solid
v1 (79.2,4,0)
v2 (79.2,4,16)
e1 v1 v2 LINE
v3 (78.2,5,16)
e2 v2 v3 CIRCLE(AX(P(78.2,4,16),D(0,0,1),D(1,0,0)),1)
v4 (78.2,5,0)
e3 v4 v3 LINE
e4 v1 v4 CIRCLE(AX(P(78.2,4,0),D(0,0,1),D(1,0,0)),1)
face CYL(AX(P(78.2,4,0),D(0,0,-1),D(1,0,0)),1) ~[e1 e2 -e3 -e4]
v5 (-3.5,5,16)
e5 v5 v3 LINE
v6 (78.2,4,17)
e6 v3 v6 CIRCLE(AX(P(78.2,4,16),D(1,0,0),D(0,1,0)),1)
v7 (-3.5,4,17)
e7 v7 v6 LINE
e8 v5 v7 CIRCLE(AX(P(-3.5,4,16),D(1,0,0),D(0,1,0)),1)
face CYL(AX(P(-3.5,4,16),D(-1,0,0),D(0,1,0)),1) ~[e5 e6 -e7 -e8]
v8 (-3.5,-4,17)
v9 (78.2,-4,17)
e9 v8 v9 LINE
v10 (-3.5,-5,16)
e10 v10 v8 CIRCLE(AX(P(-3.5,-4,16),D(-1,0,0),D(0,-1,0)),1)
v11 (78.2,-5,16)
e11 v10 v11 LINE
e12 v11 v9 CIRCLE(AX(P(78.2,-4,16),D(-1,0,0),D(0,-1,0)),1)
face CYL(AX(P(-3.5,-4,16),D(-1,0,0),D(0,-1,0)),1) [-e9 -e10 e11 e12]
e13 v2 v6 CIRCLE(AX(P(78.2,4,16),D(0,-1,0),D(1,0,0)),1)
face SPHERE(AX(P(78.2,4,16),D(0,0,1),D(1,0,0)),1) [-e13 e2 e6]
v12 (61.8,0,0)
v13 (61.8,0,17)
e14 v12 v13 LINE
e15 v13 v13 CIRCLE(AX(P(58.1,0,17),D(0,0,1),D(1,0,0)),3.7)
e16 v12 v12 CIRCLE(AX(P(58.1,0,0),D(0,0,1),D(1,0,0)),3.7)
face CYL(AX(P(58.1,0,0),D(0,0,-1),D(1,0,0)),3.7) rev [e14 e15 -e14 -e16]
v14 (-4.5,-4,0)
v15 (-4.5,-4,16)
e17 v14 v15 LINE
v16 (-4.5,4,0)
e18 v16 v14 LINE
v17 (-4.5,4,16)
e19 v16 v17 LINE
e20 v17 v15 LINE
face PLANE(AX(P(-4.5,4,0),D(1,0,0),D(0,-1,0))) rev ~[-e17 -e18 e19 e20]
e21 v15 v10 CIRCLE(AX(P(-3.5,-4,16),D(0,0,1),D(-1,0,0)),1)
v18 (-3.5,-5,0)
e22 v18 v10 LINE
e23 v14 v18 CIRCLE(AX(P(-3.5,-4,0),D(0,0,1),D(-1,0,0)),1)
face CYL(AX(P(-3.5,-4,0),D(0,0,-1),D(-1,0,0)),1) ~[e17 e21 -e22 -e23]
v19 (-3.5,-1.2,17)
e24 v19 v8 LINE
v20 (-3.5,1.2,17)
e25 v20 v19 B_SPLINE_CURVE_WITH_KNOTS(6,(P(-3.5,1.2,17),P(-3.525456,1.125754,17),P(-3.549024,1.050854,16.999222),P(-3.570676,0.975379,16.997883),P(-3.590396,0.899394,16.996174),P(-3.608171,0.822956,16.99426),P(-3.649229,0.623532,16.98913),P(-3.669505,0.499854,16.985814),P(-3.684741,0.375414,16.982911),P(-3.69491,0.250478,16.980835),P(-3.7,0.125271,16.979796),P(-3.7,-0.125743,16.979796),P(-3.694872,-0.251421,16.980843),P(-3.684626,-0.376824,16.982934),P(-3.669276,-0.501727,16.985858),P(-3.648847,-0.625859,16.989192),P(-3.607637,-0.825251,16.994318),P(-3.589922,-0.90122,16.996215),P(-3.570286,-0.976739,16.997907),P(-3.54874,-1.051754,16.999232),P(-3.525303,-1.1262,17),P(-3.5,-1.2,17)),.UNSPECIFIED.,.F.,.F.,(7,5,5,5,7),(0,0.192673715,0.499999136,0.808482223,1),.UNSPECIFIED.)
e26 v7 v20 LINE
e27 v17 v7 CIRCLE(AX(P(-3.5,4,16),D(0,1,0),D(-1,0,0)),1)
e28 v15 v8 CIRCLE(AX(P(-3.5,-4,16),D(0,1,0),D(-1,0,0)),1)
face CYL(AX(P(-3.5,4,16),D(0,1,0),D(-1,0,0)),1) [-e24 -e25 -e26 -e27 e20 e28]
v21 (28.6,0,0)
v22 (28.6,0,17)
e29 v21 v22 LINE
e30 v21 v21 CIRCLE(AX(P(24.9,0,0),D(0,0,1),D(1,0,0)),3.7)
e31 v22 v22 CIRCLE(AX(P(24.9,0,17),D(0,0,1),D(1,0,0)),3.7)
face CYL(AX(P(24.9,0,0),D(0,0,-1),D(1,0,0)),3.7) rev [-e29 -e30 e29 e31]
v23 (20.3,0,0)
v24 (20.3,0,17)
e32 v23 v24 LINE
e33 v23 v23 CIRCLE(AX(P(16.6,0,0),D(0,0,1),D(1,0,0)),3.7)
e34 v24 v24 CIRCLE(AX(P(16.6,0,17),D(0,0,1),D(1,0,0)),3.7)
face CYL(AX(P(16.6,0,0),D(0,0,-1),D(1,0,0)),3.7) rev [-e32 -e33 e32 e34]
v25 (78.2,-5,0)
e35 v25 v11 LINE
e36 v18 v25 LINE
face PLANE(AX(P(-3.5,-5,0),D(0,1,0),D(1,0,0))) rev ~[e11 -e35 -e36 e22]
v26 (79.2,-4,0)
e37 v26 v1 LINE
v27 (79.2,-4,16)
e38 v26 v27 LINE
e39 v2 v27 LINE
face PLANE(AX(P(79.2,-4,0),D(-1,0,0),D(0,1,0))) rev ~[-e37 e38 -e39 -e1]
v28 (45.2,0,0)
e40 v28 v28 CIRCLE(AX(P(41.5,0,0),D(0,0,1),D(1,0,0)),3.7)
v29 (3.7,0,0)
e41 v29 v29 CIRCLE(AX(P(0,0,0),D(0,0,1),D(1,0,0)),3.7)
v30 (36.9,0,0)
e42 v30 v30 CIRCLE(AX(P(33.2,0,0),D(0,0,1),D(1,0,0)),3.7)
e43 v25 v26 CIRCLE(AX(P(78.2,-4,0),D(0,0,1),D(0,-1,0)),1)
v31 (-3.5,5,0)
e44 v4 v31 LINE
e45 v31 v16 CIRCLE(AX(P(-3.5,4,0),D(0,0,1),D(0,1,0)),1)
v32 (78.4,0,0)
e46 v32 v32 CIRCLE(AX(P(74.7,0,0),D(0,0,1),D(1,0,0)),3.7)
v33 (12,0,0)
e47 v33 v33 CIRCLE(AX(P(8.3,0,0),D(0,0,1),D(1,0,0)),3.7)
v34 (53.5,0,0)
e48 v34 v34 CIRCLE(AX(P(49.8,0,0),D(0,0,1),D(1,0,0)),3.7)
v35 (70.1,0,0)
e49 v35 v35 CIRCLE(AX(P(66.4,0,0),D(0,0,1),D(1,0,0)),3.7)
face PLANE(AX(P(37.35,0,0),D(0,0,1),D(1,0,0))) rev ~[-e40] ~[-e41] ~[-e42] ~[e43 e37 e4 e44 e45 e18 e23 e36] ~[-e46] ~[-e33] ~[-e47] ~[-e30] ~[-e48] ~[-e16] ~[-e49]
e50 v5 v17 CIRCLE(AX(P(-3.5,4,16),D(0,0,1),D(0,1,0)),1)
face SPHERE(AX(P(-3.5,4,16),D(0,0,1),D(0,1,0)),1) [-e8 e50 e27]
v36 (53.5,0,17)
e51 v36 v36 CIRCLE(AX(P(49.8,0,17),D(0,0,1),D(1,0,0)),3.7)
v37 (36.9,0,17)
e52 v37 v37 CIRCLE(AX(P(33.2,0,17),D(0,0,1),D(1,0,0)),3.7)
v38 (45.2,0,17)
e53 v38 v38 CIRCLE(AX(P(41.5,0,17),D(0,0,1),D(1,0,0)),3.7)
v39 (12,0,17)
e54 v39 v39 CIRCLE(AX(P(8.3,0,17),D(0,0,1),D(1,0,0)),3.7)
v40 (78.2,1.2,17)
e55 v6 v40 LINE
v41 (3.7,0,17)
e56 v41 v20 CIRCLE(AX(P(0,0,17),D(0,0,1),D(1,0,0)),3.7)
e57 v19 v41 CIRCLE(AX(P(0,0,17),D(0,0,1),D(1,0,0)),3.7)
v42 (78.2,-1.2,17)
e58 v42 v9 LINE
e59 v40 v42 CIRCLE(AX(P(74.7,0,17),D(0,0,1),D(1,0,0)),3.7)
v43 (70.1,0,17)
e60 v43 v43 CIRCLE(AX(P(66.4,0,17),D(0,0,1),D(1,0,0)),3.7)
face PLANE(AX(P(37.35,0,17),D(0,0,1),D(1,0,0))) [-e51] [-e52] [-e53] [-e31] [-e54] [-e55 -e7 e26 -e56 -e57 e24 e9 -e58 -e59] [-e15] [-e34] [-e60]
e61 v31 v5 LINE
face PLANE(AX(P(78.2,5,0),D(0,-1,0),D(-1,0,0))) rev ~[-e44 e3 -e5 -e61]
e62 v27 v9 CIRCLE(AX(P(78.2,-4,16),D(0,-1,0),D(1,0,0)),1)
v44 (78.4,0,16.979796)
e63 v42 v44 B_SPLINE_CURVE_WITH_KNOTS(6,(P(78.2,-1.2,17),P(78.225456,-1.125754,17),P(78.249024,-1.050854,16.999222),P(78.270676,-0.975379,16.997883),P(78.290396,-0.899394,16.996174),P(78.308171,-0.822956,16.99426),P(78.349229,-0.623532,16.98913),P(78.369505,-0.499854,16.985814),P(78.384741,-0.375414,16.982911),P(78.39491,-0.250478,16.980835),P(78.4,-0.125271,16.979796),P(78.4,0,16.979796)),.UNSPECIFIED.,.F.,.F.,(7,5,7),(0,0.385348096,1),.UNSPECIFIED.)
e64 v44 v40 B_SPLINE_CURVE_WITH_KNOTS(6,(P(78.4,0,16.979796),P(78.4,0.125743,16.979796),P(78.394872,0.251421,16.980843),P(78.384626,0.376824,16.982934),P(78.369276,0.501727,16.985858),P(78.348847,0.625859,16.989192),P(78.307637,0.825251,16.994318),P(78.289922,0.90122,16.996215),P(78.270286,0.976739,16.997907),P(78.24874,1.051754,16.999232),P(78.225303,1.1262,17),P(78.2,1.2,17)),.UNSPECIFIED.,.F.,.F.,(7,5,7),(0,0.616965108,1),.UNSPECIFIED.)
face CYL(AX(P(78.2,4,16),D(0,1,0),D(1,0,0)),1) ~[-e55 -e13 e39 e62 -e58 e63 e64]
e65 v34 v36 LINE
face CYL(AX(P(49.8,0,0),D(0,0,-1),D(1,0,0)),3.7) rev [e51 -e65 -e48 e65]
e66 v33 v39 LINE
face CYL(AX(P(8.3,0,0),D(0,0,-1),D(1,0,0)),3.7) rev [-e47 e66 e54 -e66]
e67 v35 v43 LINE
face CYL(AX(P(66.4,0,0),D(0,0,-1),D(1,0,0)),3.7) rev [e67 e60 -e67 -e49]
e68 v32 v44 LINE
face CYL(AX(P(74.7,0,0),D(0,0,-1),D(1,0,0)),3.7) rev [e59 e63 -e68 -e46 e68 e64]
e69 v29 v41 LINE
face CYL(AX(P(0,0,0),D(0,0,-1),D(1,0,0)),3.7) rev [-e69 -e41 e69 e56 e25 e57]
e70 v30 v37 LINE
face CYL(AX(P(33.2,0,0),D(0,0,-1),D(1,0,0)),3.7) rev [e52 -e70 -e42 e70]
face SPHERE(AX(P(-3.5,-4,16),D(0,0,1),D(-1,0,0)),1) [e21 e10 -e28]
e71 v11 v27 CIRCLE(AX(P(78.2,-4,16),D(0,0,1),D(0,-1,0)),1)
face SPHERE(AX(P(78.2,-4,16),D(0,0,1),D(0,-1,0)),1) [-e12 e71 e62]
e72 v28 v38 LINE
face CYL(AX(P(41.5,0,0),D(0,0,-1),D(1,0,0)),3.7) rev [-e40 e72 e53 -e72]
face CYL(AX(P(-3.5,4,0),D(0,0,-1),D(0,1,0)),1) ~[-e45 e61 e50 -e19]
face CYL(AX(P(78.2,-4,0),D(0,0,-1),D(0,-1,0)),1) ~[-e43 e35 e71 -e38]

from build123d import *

# Parameters (mm, degrees)
F0_R         = 3.7
F1_DEPTH     = 17
F2_T1_DEPTH  = 81.7
F2_T3_DEPTH  = 8
F2_T6_ANGLE  = 90
F2_T8_ANGLE  = 90
F2_T10_ANGLE = 90
F2_T12_ANGLE = 90


# Not quite as in the source:
# - a fillet or chamfer that OpenCascade refuses, or shapes differently, is made with other operations: its cross-section is extruded or revolved along the edge and cut away or added


with BuildPart() as f1:
    # F0 (on Top) → F1 (new body)
    with BuildSketch(Plane.XY):
        with BuildLine():
            ThreePointArc((-4.5, -4), (-4.2071067812, -4.7071067812), (-3.5, -5))
            Line((-3.5, -5), (78.2, -5))
            ThreePointArc((78.2, -5), (78.9071067812, -4.7071067812), (79.2, -4))
            Line((79.2, -4), (79.2, 4))
            ThreePointArc((79.2, 4), (78.9071067812, 4.7071067812), (78.2, 5))
            Line((78.2, 5), (-3.5, 5))
            ThreePointArc((-3.5, 5), (-4.2071067812, 4.7071067812), (-4.5, 4))
            Line((-4.5, 4), (-4.5, -4))
        make_face()
        Circle(F0_R, mode=Mode.SUBTRACT)
        with Locations((8.3, 0)):
            Circle(F0_R, mode=Mode.SUBTRACT)
        with Locations((16.6, 0)):
            Circle(F0_R, mode=Mode.SUBTRACT)
        with Locations((24.9, 0)):
            Circle(F0_R, mode=Mode.SUBTRACT)
        with Locations((33.2, 0)):
            Circle(F0_R, mode=Mode.SUBTRACT)
        with Locations((41.5, 0)):
            Circle(F0_R, mode=Mode.SUBTRACT)
        with Locations((49.8, 0)):
            Circle(F0_R, mode=Mode.SUBTRACT)
        with Locations((58.1, 0)):
            Circle(F0_R, mode=Mode.SUBTRACT)
        with Locations((66.4, 0)):
            Circle(F0_R, mode=Mode.SUBTRACT)
        with Locations((74.7, 0)):
            Circle(F0_R, mode=Mode.SUBTRACT)
    extrude(amount=F1_DEPTH)

    # F2: fillet of radius 1 on 8 edges, made by hand

    # F2_s2 → F2_t1 (cut)
    with BuildSketch(Plane.YZ.offset(-3.5)):
        with BuildLine():
            ThreePointArc((-5, 16), (-4.7071067812, 16.7071067812), (-4, 17))
            Line((-4, 17), (-5, 17))
            Line((-5, 17), (-5, 16))
        make_face()
        with BuildLine():
            ThreePointArc((5, 16), (4.7071067812, 16.7071067812), (4, 17))
            Line((4, 17), (5, 17))
            Line((5, 17), (5, 16))
        make_face()
    extrude(amount=F2_T1_DEPTH, mode=Mode.SUBTRACT)

    # F2_s4 → F2_t3 (cut)
    with BuildSketch(Plane.XZ.offset(-4)):
        with BuildLine():
            ThreePointArc((79.2, 16), (78.9071067812, 16.7071067812), (78.2, 17))
            Line((78.2, 17), (79.2, 17))
            Line((79.2, 17), (79.2, 16))
        make_face()
        with BuildLine():
            ThreePointArc((-4.5, 16), (-4.2071067812, 16.7071067812), (-3.5, 17))
            Line((-3.5, 17), (-4.5, 17))
            Line((-4.5, 17), (-4.5, 16))
        make_face()
    extrude(amount=F2_T3_DEPTH, mode=Mode.SUBTRACT)

    # F2_s5 → F2_t6 (revolve, cut)
    with BuildSketch(Plane.XZ.offset(4)):
        with BuildLine():
            ThreePointArc((-4.5, 16), (-4.2071067812, 16.7071067812), (-3.5, 17))
            Line((-3.5, 17), (-4.5, 17))
            Line((-4.5, 17), (-4.5, 16))
        make_face()
    revolve(axis=Axis((-3.5, -4, 17), (0, 0, 1)), revolution_arc=F2_T6_ANGLE, mode=Mode.SUBTRACT)

    # F2_s7 → F2_t8 (revolve, cut)
    with BuildSketch(Plane.YZ.offset(78.2)):
        with BuildLine():
            ThreePointArc((-5, 16), (-4.7071067812, 16.7071067812), (-4, 17))
            Line((-4, 17), (-5, 17))
            Line((-5, 17), (-5, 16))
        make_face()
    revolve(axis=Axis((78.2, -4, 17), (0, 0, 1)), revolution_arc=F2_T8_ANGLE, mode=Mode.SUBTRACT)

    # F2_s9 → F2_t10 (revolve, cut)
    with BuildSketch(Plane.XZ.offset(-4)):
        with BuildLine():
            ThreePointArc((79.2, 16), (78.9071067812, 16.7071067812), (78.2, 17))
            Line((78.2, 17), (79.2, 17))
            Line((79.2, 17), (79.2, 16))
        make_face()
    revolve(axis=Axis((78.2, 4, 17), (0, 0, 1)), revolution_arc=F2_T10_ANGLE, mode=Mode.SUBTRACT)

    # F2_s11 → F2_t12 (revolve, cut)
    with BuildSketch(Plane.YZ.offset(-3.5)):
        with BuildLine():
            ThreePointArc((5, 16), (4.7071067812, 16.7071067812), (4, 17))
            Line((4, 17), (5, 17))
            Line((5, 17), (5, 16))
        make_face()
    revolve(axis=Axis((-3.5, 4, 17), (0, 0, 1)), revolution_arc=F2_T12_ANGLE, mode=Mode.SUBTRACT)


solid = f1.part
